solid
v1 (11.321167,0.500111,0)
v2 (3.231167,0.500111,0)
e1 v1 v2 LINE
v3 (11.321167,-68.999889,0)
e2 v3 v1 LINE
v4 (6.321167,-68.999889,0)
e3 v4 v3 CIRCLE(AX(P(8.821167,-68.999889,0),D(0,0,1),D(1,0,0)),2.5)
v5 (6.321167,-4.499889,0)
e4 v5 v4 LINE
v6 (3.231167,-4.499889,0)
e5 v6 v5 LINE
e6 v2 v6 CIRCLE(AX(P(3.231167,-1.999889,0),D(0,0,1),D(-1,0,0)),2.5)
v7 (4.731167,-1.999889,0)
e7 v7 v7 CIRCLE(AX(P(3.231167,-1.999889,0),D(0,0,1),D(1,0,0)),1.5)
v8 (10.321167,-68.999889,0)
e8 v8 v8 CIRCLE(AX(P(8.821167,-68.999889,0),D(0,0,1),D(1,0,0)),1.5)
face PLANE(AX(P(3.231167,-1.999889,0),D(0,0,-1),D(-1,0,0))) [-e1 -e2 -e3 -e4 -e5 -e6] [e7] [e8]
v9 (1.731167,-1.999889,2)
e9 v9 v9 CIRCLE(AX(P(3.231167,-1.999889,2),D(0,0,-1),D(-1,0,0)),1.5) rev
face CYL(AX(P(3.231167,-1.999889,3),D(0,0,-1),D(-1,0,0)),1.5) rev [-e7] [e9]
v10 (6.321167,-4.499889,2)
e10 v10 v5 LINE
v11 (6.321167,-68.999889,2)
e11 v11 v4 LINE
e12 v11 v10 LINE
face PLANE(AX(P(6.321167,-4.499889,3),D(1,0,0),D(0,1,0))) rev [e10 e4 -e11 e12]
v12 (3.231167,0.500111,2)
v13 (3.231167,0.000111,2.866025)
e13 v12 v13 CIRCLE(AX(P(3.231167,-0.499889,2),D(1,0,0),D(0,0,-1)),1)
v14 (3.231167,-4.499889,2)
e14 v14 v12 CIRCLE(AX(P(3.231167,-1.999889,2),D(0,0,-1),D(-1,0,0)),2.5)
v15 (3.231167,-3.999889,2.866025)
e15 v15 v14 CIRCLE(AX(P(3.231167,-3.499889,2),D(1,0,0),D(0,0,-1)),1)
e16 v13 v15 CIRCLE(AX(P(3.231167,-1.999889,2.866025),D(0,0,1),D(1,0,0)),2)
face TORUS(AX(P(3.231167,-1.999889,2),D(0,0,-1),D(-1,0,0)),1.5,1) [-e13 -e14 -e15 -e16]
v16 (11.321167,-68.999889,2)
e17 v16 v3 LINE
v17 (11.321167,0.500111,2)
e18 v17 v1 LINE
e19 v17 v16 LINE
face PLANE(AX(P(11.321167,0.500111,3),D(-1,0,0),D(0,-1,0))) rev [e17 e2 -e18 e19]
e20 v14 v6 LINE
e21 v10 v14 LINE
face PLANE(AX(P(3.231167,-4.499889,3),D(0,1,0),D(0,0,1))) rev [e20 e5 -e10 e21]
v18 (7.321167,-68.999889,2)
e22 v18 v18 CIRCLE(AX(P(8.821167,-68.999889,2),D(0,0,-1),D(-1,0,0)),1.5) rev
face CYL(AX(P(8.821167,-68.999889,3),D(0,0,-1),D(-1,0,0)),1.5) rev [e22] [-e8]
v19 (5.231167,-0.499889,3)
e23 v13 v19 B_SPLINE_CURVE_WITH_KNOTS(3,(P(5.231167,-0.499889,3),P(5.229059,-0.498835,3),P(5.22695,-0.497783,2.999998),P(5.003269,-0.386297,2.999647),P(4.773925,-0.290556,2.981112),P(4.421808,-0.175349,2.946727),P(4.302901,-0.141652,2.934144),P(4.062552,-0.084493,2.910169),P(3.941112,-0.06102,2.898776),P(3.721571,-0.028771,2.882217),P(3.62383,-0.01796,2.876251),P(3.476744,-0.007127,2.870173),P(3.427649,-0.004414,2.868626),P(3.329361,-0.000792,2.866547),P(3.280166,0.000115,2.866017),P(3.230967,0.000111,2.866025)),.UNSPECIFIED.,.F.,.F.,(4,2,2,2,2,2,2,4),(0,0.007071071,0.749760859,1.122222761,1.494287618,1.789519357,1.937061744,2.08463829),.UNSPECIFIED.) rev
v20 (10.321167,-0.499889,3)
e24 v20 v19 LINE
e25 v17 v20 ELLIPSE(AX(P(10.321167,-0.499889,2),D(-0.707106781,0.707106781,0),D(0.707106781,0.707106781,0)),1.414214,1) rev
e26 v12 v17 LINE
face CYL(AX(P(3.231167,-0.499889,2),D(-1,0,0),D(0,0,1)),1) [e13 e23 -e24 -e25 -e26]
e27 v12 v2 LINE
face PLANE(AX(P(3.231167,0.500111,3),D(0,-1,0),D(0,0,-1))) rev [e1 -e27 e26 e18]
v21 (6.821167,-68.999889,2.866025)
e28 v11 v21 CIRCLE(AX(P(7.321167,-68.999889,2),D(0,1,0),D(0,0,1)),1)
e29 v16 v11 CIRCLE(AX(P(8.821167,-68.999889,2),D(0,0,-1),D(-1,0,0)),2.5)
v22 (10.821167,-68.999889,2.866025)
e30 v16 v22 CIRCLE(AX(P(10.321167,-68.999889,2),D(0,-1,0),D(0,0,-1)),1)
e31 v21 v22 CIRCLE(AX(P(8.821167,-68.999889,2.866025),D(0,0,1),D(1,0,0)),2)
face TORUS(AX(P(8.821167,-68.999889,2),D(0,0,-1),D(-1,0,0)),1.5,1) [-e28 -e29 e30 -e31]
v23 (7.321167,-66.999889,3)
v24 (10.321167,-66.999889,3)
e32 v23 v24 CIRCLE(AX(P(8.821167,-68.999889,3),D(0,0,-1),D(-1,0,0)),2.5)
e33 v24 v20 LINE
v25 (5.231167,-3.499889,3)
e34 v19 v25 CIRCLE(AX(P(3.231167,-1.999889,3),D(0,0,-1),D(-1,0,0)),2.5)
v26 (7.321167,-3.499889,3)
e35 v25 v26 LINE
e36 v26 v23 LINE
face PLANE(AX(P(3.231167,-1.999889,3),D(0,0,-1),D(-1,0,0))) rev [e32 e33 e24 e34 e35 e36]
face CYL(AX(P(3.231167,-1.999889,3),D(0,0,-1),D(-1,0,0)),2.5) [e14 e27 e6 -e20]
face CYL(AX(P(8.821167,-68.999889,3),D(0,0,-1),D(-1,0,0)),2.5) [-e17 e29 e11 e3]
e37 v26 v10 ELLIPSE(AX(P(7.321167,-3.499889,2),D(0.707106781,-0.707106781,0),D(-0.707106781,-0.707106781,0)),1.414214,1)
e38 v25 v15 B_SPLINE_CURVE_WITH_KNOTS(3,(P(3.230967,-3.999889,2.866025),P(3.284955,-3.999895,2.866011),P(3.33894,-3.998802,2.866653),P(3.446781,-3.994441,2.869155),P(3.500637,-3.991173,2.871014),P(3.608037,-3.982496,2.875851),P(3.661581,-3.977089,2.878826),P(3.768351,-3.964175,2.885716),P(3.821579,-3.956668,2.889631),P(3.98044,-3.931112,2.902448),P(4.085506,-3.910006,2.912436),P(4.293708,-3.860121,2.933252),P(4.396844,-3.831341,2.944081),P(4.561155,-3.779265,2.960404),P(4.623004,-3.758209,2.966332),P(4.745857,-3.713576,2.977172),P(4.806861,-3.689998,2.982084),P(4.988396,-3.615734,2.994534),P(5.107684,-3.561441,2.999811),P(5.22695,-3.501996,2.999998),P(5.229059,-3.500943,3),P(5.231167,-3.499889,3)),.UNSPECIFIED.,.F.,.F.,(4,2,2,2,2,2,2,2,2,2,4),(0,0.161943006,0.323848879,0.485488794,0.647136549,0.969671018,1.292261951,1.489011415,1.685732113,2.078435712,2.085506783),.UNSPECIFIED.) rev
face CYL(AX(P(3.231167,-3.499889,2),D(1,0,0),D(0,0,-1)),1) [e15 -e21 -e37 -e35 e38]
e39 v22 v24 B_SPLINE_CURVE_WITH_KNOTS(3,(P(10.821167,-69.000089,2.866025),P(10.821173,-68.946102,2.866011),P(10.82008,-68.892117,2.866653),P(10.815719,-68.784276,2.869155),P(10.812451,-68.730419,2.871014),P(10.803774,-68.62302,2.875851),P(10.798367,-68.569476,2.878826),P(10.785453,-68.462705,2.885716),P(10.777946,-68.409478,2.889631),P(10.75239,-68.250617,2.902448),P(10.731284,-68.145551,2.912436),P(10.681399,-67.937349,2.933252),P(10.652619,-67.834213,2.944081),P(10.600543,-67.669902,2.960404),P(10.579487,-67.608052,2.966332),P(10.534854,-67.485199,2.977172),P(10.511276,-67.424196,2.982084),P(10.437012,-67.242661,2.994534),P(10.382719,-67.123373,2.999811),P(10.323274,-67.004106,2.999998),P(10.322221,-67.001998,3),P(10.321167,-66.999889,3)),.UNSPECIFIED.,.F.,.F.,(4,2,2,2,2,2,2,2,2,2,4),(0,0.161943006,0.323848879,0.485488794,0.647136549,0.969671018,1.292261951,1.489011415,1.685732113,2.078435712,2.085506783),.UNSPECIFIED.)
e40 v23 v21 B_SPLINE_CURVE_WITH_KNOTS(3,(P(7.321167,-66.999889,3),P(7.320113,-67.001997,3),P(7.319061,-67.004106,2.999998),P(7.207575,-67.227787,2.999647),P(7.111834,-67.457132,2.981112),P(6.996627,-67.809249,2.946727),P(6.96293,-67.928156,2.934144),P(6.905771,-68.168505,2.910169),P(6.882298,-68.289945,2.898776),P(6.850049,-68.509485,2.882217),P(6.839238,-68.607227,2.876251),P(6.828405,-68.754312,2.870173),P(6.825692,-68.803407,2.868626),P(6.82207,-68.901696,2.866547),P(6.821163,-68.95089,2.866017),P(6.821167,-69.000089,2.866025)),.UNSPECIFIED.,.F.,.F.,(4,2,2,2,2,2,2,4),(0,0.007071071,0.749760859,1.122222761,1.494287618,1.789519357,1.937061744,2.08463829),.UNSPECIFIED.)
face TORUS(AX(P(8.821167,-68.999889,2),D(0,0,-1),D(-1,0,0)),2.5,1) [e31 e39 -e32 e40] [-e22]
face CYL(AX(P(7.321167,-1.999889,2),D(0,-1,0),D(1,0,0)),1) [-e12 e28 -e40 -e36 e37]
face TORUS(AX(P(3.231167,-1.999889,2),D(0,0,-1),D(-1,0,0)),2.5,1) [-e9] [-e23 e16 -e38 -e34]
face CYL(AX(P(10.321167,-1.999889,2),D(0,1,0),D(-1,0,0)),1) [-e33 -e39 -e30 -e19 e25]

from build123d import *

# Parameters (mm, degrees)
SKETCH1_R           = 1.5
BOSS_EXTRUDE1_DEPTH = 3
FILLET1_R           = 1


with BuildPart() as part:
    # Sketch1 → Boss-Extrude1 (new body)
    with BuildSketch(Plane.XY):
        with BuildLine():
            Line((3.231167374, -4.499889348), (6.321167374, -4.499889348))
            Line((6.321167374, -4.499889348), (6.321167374, -68.999889348))
            ThreePointArc((6.321167374, -68.999889348), (8.821167374, -71.499889348), (11.321167374, -68.999889348))
            Line((11.321167374, -68.999889348), (11.321167374, 0.500110652))
            Line((11.321167374, 0.500110652), (3.231167374, 0.500110652))
            ThreePointArc((3.231167374, 0.500110652), (0.731167374, -1.999889348), (3.231167374, -4.499889348))
        make_face()
        with Locations((3.231167374, -1.999889348)):
            Circle(SKETCH1_R, mode=Mode.SUBTRACT)
        with Locations((8.821167374, -68.999889348)):
            Circle(SKETCH1_R, mode=Mode.SUBTRACT)
    extrude(amount=BOSS_EXTRUDE1_DEPTH)

    # Fillet1
    # the kernel refuses this fillet: 1 mm, written as the material it takes off along each edge
    with BuildSketch(Plane(origin=(8.821167374, -68.999889348, 3), x_dir=(1, 0, 0), z_dir=(0, -1, 0))) as fillet1_piece_1:
        with BuildLine():
            CenterArc((1.5 + FILLET1_R, -FILLET1_R), FILLET1_R, 90, 90)
            Line((1.5 + FILLET1_R, 0), (1.5, 0))
            Line((1.5, 0), (1.5, -FILLET1_R))
        make_face()
    revolve(axis=Axis((8.821167374, -68.999889348, 3), (0, 0, 1)), mode=Mode.SUBTRACT)
    with BuildSketch(Plane(origin=(3.231167374, -1.999889348, 3), x_dir=(1, 0, 0), z_dir=(0, -1, 0))) as fillet1_piece_2:
        with BuildLine():
            CenterArc((1.5 + FILLET1_R, -FILLET1_R), FILLET1_R, 90, 90)
            Line((1.5 + FILLET1_R, 0), (1.5, 0))
            Line((1.5, 0), (1.5, -FILLET1_R))
        make_face()
    revolve(axis=Axis((3.231167374, -1.999889348, 3), (0, 0, 1)), mode=Mode.SUBTRACT)
    with BuildSketch(Plane(origin=(13.821167374, 0.500110652, 3), x_dir=(0, 0, -1), z_dir=(-1, 0, 0))) as fillet1_piece_3:
        with BuildLine():
            CenterArc((FILLET1_R, FILLET1_R), FILLET1_R, 180, 90)
            Line((0, FILLET1_R), (0, 0))
            Line((0, 0), (FILLET1_R, 0))
        make_face()
    extrude(amount=10.59, mode=Mode.SUBTRACT)
    with BuildSketch(Plane(origin=(11.321167374, -68.999889348, 3), x_dir=(0, 0, -1), z_dir=(0, 1, 0))) as fillet1_piece_4:
        with BuildLine():
            CenterArc((FILLET1_R, FILLET1_R), FILLET1_R, 180, 90)
            Line((0, FILLET1_R), (0, 0))
            Line((0, 0), (FILLET1_R, 0))
        make_face()
    extrude(amount=72, mode=Mode.SUBTRACT)
    with BuildSketch(Plane(origin=(8.821167374, -68.999889348, 3), x_dir=(-1, 0, 0), z_dir=(0, 1, 0))) as fillet1_piece_5:
        with BuildLine():
            CenterArc((2.5 - FILLET1_R, -FILLET1_R), FILLET1_R, 0, 90)
            Line((2.5 - FILLET1_R, 0), (2.5, 0))
            Line((2.5, 0), (2.5, -FILLET1_R))
        make_face()
    revolve(axis=Axis((8.821167374, -68.999889348, 3), (0, 0, 1)), revolution_arc=180, mode=Mode.SUBTRACT)
    with BuildSketch(Plane(origin=(6.321167374, -4.499889348, 3), x_dir=(0, 0, -1), z_dir=(0, -1, 0))) as fillet1_piece_6:
        with BuildLine():
            CenterArc((FILLET1_R, FILLET1_R), FILLET1_R, 180, 90)
            Line((0, FILLET1_R), (0, 0))
            Line((0, 0), (FILLET1_R, 0))
        make_face()
    extrude(amount=64.5, mode=Mode.SUBTRACT)
    with BuildSketch(Plane(origin=(3.231167374, -4.499889348, 3), x_dir=(0, 0, -1), z_dir=(1, 0, 0))) as fillet1_piece_7:
        with BuildLine():
            CenterArc((FILLET1_R, FILLET1_R), FILLET1_R, 180, 90)
            Line((0, FILLET1_R), (0, 0))
            Line((0, 0), (FILLET1_R, 0))
        make_face()
    extrude(amount=3.09, mode=Mode.SUBTRACT)
    with BuildSketch(Plane(origin=(3.231167374, -1.999889348, 3), x_dir=(0, 1, 0), z_dir=(1, 0, 0))) as fillet1_piece_8:
        with BuildLine():
            CenterArc((2.5 - FILLET1_R, -FILLET1_R), FILLET1_R, 0, 90)
            Line((2.5 - FILLET1_R, 0), (2.5, 0))
            Line((2.5, 0), (2.5, -FILLET1_R))
        make_face()
    revolve(axis=Axis((3.231167374, -1.999889348, 3), (0, 0, 1)), revolution_arc=180, mode=Mode.SUBTRACT)
    with BuildSketch(Plane(origin=(3.231167374, -4.499889348, 3), x_dir=(0, 0, -1), z_dir=(1, 0, 0))) as fillet1_piece_9a_section:
        with BuildLine():
            CenterArc((FILLET1_R, FILLET1_R), FILLET1_R, 180, 90)
            Line((0, FILLET1_R), (0, 0))
            Line((0, 0), (FILLET1_R, 0))
        make_face()
    fillet1_piece_9a = extrude(amount=5.59, mode=Mode.PRIVATE)
    fillet1_piece_9a = split(fillet1_piece_9a, bisect_by=Plane(origin=(6.321167374, -4.273494233, 2.773604886), z_dir=(1, 0, 0)), keep=Keep.TOP, mode=Mode.PRIVATE)
    with BuildSketch(Plane(origin=(6.321167374, -1.999889348, 3), x_dir=(0, 0, -1), z_dir=(0, -1, 0))) as fillet1_piece_9b_section:
        with BuildLine():
            CenterArc((FILLET1_R, FILLET1_R), FILLET1_R, 180, 90)
            Line((0, FILLET1_R), (0, 0))
            Line((0, 0), (FILLET1_R, 0))
        make_face()
    fillet1_piece_9b = extrude(amount=67, mode=Mode.PRIVATE)
    fillet1_piece_9b = split(fillet1_piece_9b, bisect_by=Plane(origin=(6.547562488, -4.499889348, 2.773604886), z_dir=(0, 1, 0)), keep=Keep.TOP, mode=Mode.PRIVATE)
    fillet1_piece_9 = fillet1_piece_9a & fillet1_piece_9b
    add(fillet1_piece_9, mode=Mode.SUBTRACT)


solid = part.part
